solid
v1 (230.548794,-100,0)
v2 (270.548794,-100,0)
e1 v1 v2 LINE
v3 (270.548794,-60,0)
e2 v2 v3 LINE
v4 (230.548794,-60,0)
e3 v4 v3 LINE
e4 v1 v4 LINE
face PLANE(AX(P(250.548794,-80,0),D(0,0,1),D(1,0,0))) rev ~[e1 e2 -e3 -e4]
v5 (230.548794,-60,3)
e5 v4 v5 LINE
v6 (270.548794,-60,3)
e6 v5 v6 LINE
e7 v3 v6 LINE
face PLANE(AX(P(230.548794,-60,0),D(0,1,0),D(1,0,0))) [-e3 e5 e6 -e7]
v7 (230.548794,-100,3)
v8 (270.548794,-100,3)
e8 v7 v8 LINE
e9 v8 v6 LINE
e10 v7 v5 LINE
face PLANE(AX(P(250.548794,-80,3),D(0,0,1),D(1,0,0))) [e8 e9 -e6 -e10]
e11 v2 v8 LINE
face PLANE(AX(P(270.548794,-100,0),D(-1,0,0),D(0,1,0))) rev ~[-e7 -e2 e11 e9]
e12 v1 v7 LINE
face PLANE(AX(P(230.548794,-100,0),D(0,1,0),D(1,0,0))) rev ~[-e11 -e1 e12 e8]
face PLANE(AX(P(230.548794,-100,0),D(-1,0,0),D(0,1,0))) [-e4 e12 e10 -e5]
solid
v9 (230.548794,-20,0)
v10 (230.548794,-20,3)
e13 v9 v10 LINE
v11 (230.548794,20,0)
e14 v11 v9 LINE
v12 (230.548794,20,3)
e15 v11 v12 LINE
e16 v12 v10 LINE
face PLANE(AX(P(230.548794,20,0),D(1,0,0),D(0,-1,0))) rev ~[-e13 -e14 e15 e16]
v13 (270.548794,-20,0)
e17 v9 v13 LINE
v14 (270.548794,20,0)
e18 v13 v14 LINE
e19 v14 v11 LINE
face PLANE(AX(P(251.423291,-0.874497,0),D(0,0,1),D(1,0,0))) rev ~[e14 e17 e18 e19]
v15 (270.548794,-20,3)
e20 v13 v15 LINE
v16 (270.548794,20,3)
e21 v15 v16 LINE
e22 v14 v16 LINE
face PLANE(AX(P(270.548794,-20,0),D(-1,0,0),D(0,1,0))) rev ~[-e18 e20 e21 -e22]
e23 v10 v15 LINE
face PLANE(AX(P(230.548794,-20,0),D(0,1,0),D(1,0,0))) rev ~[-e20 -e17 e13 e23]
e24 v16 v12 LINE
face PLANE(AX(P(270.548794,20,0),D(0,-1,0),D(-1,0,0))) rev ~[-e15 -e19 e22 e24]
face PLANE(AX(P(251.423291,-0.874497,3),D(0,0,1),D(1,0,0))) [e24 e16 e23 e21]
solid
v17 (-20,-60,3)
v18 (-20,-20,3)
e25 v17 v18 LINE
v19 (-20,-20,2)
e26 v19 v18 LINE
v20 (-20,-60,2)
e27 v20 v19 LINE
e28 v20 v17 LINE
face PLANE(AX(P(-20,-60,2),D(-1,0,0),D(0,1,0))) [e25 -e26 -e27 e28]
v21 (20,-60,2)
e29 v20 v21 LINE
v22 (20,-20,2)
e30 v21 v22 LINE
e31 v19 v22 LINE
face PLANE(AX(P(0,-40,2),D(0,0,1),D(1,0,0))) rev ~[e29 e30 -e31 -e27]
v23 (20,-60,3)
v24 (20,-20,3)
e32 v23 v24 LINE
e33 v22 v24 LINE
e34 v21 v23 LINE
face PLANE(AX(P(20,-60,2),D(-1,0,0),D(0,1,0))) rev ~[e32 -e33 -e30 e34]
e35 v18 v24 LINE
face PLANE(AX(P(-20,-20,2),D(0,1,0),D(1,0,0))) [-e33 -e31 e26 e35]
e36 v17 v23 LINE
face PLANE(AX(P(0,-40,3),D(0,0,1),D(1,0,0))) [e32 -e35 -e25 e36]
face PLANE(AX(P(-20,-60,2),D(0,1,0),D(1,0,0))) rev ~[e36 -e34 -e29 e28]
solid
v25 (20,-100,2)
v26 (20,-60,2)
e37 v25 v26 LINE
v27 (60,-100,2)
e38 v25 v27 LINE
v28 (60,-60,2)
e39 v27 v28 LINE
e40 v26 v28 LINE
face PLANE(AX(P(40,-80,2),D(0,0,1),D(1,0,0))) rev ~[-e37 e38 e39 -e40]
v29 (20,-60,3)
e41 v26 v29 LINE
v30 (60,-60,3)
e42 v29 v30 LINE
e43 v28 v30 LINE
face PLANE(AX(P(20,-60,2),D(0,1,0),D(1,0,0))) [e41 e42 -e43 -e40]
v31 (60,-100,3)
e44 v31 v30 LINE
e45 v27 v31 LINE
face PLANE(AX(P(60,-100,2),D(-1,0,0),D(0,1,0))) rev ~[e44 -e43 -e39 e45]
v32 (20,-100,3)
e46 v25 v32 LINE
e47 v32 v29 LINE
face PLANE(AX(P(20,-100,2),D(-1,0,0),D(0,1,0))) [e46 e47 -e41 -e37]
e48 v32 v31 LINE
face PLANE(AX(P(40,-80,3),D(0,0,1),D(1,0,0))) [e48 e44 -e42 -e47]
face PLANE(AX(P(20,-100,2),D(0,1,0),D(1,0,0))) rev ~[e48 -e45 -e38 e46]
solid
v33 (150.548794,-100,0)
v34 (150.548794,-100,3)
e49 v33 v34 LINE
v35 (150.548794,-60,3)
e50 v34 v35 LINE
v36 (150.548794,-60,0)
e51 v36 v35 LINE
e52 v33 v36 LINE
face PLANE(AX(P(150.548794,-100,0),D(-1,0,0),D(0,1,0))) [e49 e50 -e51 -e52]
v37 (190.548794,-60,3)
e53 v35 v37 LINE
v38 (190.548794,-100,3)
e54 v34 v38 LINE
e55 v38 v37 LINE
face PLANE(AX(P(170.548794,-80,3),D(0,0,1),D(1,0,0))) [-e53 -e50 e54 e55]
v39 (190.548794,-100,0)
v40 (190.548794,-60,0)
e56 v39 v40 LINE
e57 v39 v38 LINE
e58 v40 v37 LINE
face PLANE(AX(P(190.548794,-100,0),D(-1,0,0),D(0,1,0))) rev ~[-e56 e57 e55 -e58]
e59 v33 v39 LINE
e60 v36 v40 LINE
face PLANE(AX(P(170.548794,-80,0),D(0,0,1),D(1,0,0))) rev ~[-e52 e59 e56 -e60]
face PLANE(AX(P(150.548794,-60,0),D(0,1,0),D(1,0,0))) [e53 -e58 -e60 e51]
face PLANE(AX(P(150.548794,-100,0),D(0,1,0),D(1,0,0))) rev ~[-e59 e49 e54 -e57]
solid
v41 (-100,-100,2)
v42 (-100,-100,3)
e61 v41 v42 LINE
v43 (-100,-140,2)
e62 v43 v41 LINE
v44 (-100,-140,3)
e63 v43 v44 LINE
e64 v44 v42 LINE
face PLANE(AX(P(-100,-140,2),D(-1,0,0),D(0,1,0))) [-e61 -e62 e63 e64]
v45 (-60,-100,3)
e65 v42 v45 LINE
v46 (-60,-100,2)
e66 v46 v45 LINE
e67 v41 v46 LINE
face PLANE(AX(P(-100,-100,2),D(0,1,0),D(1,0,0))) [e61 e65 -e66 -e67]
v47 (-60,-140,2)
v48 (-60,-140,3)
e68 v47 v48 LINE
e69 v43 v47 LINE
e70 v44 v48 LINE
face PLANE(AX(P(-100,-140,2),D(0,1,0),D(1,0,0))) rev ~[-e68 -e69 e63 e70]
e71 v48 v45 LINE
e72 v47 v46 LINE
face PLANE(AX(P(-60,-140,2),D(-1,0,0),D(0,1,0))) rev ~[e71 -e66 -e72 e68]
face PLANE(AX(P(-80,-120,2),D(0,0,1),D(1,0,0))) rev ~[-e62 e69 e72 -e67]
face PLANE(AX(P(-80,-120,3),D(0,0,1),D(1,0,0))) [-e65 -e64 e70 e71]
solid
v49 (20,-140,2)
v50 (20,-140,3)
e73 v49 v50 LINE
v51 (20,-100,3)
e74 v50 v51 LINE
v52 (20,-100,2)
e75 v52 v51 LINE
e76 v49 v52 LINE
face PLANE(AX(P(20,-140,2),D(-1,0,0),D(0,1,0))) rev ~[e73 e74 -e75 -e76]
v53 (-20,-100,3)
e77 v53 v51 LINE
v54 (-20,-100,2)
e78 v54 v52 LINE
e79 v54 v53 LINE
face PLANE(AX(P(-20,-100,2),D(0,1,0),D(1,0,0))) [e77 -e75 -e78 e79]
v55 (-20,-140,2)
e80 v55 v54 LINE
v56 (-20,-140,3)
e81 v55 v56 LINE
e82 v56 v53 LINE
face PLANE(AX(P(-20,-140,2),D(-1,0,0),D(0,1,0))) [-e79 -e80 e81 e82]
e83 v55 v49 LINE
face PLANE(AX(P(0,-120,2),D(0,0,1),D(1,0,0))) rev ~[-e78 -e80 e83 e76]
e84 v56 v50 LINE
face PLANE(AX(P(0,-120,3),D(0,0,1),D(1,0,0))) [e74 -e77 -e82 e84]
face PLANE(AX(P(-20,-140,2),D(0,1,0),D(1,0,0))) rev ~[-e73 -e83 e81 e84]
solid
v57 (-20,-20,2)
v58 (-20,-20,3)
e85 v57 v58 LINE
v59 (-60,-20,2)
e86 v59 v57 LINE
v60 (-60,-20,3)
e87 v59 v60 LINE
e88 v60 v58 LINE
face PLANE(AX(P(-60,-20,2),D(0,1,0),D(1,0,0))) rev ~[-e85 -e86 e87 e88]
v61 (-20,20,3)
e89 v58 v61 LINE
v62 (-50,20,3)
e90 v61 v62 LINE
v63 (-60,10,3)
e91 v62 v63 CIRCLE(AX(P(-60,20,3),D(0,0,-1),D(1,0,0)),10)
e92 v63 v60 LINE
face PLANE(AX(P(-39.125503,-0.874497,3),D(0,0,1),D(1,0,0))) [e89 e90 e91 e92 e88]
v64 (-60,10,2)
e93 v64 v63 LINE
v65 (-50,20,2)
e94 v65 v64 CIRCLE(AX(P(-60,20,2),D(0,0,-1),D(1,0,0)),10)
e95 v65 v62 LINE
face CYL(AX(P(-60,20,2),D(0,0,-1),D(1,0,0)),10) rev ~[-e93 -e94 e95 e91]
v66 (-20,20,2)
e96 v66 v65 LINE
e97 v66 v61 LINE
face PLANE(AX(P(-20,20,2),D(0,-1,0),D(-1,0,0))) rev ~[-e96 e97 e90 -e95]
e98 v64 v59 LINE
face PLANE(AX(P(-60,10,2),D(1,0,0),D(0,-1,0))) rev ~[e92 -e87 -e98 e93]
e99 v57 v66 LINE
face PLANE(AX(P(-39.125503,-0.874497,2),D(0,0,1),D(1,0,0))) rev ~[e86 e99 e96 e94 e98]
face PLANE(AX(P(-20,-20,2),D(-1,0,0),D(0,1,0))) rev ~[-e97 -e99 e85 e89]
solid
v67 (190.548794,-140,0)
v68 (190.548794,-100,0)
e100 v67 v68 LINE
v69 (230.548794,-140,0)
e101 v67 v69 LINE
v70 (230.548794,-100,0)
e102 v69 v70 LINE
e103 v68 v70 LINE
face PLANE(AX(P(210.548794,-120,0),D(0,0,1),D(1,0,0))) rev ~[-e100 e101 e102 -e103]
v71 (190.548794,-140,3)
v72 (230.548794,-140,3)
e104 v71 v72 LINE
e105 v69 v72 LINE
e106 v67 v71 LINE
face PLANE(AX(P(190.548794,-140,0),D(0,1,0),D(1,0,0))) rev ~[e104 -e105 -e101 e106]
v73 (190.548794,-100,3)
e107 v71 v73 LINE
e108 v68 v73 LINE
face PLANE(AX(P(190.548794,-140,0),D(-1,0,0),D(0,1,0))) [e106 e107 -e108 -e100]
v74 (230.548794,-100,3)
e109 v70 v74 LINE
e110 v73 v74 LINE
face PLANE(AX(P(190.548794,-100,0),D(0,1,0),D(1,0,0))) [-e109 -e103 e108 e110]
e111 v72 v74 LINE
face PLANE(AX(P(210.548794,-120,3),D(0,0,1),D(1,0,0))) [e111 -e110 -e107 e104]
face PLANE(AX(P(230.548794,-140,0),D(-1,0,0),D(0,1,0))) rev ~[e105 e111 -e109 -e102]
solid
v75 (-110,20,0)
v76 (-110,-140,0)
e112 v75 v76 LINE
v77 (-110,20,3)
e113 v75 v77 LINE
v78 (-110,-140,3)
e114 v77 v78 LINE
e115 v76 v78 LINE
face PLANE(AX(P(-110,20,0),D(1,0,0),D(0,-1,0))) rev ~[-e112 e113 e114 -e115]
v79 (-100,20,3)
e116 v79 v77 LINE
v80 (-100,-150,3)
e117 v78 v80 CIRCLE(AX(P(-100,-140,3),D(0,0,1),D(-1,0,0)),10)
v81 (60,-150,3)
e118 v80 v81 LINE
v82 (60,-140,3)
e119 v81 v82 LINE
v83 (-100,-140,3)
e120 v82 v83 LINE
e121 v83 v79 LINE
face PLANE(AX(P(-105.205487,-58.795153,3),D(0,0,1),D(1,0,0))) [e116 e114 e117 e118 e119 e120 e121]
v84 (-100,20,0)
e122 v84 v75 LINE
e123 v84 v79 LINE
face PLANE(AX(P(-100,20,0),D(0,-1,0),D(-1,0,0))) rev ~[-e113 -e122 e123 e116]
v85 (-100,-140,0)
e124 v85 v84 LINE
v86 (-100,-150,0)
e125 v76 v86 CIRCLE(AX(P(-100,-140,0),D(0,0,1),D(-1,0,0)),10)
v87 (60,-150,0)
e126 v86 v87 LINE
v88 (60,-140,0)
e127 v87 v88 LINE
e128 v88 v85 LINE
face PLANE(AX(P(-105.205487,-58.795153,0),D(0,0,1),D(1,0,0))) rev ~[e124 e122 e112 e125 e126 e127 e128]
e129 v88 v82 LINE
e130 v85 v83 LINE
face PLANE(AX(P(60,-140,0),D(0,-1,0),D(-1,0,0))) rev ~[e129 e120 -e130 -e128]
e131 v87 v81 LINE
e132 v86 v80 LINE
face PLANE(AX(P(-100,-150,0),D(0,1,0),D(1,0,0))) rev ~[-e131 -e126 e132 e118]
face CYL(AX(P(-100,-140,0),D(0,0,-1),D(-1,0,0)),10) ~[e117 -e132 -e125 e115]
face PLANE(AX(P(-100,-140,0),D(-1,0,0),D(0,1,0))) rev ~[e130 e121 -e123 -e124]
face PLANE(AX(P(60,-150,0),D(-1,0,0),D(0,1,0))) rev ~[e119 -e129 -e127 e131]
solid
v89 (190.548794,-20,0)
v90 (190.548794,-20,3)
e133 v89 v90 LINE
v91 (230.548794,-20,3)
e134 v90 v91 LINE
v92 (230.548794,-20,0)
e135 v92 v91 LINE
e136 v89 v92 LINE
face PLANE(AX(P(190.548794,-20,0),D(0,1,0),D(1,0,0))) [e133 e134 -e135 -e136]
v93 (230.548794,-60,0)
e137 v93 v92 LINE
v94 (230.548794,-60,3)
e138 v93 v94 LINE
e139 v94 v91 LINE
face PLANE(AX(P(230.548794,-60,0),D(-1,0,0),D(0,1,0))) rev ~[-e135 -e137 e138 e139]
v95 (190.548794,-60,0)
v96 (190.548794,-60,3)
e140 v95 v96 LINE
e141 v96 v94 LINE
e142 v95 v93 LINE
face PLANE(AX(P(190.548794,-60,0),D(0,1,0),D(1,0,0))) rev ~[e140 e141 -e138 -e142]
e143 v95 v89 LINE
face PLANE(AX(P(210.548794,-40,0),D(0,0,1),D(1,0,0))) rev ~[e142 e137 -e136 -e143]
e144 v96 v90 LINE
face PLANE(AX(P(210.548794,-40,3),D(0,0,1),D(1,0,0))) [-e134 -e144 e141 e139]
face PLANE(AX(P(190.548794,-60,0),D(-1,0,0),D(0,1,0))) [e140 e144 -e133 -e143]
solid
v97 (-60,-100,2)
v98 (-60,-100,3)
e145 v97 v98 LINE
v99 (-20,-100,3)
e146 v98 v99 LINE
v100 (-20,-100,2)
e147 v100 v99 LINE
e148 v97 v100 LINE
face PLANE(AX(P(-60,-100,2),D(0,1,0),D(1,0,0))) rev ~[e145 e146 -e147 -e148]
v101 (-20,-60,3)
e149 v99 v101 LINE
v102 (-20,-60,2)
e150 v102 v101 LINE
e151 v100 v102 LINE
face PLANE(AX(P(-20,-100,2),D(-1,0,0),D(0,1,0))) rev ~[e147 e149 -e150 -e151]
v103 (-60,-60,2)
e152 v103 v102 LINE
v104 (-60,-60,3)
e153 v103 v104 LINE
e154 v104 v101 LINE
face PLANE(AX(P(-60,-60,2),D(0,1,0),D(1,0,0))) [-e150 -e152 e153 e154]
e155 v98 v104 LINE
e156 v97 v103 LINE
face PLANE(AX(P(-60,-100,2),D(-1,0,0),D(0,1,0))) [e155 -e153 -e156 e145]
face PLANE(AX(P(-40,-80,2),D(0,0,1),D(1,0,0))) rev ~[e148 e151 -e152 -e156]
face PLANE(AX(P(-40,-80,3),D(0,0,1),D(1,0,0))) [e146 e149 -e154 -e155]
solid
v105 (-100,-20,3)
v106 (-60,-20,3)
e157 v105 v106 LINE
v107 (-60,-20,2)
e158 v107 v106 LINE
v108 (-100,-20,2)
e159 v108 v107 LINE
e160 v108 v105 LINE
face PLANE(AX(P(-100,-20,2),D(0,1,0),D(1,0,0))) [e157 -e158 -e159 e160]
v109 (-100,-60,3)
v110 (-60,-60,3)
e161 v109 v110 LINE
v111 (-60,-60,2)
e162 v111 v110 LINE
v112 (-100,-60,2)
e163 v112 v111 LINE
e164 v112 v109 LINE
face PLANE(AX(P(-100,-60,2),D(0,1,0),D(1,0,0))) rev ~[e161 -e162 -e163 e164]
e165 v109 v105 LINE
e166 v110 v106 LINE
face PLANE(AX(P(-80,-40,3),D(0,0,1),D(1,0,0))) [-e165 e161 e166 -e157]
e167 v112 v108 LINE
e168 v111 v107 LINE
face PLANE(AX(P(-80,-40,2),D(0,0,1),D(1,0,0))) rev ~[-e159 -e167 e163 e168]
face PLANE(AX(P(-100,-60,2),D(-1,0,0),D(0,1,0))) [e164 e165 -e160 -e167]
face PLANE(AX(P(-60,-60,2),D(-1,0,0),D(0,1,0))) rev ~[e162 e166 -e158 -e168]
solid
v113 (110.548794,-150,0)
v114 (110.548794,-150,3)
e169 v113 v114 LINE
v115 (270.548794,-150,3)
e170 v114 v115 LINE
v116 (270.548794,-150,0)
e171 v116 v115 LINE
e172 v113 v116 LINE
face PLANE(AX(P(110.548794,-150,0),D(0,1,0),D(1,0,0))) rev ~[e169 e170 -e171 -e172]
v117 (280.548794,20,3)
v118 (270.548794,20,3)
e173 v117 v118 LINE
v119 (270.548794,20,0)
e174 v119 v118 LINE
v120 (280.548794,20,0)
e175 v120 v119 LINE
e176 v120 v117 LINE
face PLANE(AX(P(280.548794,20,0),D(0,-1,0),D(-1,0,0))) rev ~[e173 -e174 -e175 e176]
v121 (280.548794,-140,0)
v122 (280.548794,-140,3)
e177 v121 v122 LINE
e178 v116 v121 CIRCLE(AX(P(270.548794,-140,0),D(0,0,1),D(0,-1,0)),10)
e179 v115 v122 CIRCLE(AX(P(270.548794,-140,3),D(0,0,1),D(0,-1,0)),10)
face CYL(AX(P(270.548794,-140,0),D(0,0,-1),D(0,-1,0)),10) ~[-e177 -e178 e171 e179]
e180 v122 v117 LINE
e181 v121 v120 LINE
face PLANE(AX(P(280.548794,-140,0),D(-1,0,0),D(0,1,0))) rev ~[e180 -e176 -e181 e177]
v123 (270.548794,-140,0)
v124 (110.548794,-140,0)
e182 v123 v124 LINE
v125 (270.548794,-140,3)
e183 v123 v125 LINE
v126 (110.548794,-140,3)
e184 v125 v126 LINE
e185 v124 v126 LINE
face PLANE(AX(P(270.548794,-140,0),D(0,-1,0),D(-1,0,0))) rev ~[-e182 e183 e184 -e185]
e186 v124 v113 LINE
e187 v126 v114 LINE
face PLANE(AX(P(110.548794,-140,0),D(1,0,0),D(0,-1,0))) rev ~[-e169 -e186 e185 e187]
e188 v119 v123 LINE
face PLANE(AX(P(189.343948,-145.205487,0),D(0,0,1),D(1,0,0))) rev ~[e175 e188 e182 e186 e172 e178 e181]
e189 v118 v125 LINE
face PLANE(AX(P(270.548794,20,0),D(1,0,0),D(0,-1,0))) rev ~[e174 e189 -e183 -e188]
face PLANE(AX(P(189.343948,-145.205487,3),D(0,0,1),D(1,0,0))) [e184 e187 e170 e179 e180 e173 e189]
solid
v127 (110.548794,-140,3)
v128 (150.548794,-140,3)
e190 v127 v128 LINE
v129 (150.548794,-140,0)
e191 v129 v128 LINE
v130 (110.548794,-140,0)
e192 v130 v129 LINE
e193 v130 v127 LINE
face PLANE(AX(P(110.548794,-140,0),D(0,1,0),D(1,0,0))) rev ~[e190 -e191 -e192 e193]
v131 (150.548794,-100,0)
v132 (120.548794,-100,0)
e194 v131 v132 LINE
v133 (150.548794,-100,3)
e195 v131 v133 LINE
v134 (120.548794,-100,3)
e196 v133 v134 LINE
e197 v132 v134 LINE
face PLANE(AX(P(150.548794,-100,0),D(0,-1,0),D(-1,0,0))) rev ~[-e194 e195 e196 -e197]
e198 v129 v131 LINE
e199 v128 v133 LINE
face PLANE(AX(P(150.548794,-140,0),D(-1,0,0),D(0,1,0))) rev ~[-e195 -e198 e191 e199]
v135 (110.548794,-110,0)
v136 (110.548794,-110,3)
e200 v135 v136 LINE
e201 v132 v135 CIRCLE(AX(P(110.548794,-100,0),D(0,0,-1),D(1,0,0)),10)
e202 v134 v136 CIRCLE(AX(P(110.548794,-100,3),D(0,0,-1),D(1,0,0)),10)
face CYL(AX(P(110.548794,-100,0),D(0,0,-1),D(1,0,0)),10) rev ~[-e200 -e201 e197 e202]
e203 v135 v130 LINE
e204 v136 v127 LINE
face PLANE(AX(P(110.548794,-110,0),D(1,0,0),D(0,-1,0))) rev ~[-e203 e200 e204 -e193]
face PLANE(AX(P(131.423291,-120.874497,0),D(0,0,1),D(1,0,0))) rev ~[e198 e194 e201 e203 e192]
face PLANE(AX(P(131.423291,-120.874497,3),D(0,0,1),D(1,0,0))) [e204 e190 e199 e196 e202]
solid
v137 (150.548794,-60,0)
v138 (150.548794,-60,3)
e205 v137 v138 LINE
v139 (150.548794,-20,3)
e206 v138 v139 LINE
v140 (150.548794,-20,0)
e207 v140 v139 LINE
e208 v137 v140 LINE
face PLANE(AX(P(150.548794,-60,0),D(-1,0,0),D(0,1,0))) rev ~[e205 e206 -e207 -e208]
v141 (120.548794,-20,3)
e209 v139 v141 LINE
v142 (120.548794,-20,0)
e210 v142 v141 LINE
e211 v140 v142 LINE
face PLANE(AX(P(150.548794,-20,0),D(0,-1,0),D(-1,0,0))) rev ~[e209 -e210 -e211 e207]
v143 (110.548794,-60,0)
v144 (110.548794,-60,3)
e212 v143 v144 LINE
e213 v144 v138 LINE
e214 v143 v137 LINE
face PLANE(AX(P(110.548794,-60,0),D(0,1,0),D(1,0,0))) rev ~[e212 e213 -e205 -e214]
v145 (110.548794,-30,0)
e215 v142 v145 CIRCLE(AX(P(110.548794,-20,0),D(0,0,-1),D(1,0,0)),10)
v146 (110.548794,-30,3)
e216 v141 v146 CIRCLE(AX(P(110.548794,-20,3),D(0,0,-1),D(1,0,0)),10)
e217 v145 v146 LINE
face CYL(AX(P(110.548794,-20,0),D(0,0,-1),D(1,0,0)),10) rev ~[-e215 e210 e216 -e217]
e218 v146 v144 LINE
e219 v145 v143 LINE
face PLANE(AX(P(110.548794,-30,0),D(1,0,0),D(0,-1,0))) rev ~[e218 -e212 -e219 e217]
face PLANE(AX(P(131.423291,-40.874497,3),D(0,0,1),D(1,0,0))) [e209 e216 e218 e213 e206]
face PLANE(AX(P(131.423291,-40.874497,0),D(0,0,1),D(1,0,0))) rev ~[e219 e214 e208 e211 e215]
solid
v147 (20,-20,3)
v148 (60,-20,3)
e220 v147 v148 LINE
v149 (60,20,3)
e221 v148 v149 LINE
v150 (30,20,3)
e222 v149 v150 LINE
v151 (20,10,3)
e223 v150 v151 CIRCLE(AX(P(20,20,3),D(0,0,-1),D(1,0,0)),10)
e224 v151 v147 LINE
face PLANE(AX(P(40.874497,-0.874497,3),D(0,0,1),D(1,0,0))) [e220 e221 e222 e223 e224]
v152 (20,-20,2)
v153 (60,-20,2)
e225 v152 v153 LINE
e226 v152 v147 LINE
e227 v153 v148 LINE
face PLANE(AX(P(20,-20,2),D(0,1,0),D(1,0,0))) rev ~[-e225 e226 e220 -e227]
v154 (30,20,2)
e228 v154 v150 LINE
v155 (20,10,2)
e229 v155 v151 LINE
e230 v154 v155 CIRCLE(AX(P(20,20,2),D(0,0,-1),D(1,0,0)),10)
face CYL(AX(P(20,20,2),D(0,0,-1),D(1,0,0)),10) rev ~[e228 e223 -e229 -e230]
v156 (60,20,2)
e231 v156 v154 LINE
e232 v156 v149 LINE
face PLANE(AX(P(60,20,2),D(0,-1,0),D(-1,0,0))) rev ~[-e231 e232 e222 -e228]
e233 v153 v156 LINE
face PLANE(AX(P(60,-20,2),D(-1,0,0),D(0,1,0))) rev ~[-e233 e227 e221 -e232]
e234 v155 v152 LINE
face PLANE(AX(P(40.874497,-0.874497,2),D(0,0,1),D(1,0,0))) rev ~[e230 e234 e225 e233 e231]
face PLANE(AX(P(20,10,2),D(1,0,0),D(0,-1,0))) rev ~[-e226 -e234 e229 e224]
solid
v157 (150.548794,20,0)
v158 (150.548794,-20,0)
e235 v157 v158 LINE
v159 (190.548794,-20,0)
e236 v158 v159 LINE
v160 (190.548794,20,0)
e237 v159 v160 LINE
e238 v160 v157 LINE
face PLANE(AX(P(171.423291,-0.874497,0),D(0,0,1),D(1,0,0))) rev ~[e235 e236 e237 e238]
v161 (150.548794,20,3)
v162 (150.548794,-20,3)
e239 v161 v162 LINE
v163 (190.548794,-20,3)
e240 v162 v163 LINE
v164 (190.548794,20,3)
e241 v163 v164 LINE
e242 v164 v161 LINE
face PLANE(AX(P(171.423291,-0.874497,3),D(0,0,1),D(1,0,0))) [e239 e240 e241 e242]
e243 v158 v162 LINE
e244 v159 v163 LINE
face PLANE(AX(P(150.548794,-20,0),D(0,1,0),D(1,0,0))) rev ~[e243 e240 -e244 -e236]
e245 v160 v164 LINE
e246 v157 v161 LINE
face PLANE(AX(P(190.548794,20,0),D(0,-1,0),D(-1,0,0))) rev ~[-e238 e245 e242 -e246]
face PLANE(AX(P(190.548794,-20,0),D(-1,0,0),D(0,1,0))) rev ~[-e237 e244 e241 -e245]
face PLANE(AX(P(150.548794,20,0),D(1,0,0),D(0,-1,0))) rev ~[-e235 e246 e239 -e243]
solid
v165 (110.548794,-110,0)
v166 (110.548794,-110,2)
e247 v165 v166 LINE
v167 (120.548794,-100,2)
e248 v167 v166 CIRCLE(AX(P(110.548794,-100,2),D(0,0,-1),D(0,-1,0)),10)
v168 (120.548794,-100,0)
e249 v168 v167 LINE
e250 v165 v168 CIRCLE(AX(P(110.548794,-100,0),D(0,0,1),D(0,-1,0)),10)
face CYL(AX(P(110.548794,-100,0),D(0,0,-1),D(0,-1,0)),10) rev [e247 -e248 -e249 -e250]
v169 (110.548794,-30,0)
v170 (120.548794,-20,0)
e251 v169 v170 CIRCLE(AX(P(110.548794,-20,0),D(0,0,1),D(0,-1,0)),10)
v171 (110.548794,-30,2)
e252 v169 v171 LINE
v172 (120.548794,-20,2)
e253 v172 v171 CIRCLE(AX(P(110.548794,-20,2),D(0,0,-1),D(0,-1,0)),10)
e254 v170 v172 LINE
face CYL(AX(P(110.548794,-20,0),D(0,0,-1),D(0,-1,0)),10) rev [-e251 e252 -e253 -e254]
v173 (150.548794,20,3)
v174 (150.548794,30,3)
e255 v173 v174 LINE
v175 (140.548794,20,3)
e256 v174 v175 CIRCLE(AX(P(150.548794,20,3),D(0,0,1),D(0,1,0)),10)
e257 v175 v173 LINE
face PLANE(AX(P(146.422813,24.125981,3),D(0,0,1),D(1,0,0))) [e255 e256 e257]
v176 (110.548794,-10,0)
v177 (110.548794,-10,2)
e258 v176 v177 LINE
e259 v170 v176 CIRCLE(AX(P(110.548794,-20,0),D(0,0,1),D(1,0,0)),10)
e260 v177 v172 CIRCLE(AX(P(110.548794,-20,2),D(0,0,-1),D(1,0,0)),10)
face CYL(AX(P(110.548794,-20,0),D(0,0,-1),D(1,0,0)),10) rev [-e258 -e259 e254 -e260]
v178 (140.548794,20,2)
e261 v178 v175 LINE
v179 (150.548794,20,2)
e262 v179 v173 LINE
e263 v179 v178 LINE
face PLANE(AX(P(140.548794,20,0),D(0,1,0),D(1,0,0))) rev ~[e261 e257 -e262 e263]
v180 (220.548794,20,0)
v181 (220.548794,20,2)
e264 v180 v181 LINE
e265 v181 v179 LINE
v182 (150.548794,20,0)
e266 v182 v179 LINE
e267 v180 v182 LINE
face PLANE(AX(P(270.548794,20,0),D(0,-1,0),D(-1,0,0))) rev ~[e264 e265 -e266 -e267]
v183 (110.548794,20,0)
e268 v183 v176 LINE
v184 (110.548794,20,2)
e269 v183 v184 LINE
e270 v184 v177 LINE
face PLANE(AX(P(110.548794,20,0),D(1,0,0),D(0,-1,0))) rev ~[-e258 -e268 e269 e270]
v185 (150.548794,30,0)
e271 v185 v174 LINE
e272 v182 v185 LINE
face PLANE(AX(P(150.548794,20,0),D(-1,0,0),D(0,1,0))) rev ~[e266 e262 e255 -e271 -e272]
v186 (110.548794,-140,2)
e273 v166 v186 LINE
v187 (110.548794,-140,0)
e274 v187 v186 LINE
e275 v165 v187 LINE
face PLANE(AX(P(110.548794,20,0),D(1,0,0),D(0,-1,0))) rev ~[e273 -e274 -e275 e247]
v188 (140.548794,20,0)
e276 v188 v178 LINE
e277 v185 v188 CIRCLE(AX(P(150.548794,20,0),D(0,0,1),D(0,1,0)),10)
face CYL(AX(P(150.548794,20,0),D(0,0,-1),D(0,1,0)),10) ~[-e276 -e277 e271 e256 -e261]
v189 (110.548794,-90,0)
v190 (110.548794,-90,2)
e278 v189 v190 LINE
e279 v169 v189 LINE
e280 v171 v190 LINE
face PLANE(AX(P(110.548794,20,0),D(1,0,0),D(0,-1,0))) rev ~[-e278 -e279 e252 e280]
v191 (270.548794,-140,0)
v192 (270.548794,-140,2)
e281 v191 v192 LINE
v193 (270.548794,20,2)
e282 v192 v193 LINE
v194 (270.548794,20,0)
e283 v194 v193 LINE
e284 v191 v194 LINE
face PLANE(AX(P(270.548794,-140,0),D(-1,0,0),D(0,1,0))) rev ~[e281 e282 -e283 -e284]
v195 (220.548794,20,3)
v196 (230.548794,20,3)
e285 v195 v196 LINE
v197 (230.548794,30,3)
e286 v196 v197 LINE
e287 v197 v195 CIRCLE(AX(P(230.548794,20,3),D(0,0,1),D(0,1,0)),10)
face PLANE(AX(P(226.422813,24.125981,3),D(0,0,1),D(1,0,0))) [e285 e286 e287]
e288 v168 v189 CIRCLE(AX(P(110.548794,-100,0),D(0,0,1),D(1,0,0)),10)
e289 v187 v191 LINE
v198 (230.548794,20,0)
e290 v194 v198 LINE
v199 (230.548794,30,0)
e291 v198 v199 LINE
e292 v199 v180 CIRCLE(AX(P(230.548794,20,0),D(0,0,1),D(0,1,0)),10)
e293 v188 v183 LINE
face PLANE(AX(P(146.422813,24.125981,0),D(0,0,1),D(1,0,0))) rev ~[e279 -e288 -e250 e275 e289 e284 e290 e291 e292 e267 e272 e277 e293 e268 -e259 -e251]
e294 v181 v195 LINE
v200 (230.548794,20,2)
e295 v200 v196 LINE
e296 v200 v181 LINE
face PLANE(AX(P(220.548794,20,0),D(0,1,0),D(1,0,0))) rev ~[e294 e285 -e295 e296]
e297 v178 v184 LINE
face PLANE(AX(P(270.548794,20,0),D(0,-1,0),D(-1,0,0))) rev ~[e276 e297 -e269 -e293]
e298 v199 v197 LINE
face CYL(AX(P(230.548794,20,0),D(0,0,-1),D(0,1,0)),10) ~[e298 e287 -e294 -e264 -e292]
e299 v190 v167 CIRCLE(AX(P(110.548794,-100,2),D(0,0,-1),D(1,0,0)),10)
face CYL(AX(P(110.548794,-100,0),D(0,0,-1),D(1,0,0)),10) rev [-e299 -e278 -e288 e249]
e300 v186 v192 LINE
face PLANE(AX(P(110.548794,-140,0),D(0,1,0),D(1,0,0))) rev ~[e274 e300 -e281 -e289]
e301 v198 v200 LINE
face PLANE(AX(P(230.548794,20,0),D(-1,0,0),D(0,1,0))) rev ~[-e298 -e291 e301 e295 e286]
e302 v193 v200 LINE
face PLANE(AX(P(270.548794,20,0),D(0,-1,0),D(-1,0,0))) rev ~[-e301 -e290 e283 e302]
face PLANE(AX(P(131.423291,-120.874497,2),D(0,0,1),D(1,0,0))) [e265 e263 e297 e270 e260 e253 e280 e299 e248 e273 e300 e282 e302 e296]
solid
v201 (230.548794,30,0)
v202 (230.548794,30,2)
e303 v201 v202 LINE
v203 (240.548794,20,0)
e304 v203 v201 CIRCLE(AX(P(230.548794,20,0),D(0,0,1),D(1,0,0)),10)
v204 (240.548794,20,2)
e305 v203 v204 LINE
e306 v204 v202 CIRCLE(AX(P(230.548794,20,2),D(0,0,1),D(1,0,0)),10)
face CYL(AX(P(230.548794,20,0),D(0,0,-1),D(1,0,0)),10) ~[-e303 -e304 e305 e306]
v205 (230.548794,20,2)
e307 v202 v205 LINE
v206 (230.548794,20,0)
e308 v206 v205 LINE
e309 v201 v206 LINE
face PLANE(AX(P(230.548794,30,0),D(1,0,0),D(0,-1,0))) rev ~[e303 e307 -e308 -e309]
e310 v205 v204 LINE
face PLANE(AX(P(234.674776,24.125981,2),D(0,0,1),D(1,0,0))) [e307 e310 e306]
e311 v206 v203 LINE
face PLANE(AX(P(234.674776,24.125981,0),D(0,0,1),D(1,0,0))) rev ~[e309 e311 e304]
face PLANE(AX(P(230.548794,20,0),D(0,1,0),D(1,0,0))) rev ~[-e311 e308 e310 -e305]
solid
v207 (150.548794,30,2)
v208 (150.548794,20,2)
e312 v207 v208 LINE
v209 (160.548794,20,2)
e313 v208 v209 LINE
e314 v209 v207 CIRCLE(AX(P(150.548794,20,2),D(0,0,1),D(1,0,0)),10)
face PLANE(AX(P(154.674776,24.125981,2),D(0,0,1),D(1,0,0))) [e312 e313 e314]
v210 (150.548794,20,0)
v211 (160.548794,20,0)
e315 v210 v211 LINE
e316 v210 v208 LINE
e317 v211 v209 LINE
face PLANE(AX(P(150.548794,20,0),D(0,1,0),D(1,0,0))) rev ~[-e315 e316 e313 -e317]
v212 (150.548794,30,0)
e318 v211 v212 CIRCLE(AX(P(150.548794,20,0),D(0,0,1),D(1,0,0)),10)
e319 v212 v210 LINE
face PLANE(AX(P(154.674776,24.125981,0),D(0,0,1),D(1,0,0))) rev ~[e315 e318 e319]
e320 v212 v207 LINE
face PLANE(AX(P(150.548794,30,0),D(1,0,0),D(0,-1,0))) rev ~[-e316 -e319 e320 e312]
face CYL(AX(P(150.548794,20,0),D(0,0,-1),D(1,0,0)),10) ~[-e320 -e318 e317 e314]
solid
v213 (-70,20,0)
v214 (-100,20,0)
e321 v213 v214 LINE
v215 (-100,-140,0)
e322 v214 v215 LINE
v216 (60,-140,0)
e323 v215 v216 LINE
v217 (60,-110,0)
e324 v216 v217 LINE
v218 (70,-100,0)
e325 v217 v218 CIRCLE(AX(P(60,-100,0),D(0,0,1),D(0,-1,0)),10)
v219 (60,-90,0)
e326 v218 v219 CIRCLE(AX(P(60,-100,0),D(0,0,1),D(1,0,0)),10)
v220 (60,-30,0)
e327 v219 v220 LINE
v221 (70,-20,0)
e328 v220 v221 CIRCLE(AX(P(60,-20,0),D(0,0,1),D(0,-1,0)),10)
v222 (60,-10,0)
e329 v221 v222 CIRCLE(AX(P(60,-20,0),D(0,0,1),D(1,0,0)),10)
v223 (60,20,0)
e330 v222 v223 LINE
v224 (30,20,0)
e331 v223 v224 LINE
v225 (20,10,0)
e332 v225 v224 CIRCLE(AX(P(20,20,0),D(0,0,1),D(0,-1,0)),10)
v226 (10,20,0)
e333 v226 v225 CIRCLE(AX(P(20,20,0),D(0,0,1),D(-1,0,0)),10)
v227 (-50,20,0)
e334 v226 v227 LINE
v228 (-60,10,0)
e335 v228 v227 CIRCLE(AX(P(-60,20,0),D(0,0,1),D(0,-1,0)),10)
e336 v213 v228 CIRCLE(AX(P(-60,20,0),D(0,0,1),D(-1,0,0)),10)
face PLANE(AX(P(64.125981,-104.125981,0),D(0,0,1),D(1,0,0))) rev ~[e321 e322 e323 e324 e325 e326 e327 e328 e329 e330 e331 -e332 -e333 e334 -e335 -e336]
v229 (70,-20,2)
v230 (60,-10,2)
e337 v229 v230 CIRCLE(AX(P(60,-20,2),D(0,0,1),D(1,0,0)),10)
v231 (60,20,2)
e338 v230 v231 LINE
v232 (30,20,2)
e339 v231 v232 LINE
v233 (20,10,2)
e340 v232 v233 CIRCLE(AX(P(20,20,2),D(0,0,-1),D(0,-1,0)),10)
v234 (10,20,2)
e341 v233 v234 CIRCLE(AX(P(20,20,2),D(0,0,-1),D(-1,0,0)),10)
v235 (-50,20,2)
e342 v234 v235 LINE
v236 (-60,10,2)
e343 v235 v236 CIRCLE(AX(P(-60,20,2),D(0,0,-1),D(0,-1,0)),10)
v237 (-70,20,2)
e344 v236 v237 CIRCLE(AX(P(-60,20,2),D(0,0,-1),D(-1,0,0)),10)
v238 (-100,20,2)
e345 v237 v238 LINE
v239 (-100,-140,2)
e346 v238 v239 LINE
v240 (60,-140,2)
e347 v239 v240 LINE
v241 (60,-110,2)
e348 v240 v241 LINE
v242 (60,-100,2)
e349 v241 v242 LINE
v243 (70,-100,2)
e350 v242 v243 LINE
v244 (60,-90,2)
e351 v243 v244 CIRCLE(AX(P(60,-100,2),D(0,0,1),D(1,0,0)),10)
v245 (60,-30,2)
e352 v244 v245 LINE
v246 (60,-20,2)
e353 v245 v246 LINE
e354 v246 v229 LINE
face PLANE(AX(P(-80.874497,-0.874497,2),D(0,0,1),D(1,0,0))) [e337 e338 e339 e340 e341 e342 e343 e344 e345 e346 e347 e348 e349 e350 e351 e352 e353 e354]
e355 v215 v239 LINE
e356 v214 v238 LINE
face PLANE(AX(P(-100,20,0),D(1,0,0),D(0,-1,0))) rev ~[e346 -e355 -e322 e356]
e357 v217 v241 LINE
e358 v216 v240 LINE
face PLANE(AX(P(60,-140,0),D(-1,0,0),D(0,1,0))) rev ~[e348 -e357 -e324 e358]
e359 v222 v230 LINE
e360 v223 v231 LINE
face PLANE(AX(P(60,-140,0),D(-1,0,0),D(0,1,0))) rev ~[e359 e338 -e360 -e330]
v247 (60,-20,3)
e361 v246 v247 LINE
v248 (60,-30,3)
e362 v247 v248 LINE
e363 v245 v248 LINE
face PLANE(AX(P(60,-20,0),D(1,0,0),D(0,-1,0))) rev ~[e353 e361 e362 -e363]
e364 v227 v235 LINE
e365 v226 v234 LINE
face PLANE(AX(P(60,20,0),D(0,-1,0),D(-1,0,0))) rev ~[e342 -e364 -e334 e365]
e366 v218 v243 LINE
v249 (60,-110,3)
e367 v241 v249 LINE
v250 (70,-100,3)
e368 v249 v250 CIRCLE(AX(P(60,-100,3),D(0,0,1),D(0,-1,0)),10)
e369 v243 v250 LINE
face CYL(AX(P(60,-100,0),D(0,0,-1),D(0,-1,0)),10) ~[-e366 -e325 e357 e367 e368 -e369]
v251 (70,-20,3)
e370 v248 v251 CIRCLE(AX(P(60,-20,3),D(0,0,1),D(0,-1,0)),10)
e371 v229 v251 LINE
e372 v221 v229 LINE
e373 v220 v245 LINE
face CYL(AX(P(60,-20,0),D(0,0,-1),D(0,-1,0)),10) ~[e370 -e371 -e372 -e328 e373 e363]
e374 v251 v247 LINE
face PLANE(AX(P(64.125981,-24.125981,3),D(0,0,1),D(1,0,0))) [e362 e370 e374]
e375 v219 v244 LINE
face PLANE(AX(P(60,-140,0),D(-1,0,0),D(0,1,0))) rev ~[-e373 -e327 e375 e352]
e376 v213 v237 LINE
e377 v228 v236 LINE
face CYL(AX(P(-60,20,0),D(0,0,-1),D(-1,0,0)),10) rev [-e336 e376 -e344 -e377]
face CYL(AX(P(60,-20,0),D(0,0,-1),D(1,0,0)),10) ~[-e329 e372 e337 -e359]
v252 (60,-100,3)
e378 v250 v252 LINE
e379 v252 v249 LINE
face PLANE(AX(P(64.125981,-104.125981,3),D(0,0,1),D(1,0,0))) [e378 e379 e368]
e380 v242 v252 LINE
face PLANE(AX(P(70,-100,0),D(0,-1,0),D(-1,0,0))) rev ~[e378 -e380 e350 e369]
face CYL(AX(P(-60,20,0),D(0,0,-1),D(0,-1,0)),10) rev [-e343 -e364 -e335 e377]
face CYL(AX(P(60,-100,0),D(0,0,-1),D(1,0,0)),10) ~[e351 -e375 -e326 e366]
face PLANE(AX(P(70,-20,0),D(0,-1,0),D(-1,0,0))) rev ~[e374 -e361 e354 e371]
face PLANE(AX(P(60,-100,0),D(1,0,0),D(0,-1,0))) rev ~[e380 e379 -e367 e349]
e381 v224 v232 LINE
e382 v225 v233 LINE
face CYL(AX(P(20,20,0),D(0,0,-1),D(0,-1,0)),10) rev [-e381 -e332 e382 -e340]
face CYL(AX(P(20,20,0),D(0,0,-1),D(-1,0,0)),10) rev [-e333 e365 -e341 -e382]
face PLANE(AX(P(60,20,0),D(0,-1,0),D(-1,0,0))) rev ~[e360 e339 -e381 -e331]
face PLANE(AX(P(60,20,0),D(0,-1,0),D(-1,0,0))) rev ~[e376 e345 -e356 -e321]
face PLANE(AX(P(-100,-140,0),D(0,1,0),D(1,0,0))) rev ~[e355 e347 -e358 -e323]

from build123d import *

# Parameters (mm, degrees)
F0_W      = 40
F0_H      = 40
F1_DEPTH  = 2
F3_DEPTH  = 2
F4_DEPTH  = 5
F2_W      = 40
F2_H      = 40
F5_DEPTH  = 1
F6_DEPTH  = 2
F7_DEPTH  = 3
F8_DEPTH  = 4
F9_DEPTH  = 3
F10_DEPTH = 3
F11_DEPTH = 3
F12_DEPTH = 2


with BuildPart() as f1:
    # F0 (on Top) → F1 (new body)
    with BuildSketch(Plane.XY):
        with BuildLine():
            Line((-100, -20), (-60, -20))
            Line((-60, -20), (-60, 10))
            ThreePointArc((-60, 10), (-67.0710678119, 12.9289321881), (-70, 20))
            Line((-70, 20), (-100, 20))
            Line((-100, 20), (-100, -20))
        make_face()
        with BuildLine():
            ThreePointArc((-70, 20), (-67.0710678119, 12.9289321881), (-60, 10))
            Line((-60, 10), (-60, 20))
            Line((-60, 20), (-70, 20))
        make_face()
        with BuildLine():
            ThreePointArc((-60, 10), (-52.9289321881, 12.9289321881), (-50, 20))
            Line((-50, 20), (-60, 20))
            Line((-60, 20), (-60, 10))
        make_face()
        with BuildLine():
            Line((-60, -20), (-20, -20))
            Line((-20, -20), (-20, 20))
            Line((-20, 20), (-50, 20))
            ThreePointArc((-50, 20), (-52.9289321881, 12.9289321881), (-60, 10))
            Line((-60, 10), (-60, -20))
        make_face()
        with BuildLine():
            Line((-20, -20), (20, -20))
            Line((20, -20), (20, 10))
            ThreePointArc((20, 10), (12.9289321881, 12.9289321881), (10, 20))
            Line((10, 20), (-20, 20))
            Line((-20, 20), (-20, -20))
        make_face()
        with BuildLine():
            ThreePointArc((10, 20), (12.9289321881, 12.9289321881), (20, 10))
            Line((20, 10), (20, 20))
            Line((20, 20), (10, 20))
        make_face()
        with BuildLine():
            Line((20, 20), (20, 10))
            ThreePointArc((20, 10), (27.0710678119, 12.9289321881), (30, 20))
            Line((30, 20), (20, 20))
        make_face()
        with BuildLine():
            Line((20, 10), (20, -20))
            Line((20, -20), (50, -20))
            ThreePointArc((50, -20), (52.9289321881, -12.9289321881), (60, -10))
            Line((60, -10), (60, 20))
            Line((60, 20), (30, 20))
            ThreePointArc((30, 20), (27.0710678119, 12.9289321881), (20, 10))
        make_face()
        with BuildLine():
            ThreePointArc((60, -10), (52.9289321881, -12.9289321881), (50, -20))
            Line((50, -20), (60, -20))
            Line((60, -20), (60, -10))
        make_face()
        with BuildLine():
            Line((60, -20), (50, -20))
            ThreePointArc((50, -20), (52.9289321881, -27.0710678119), (60, -30))
            Line((60, -30), (60, -20))
        make_face()
        with BuildLine():
            Line((50, -20), (20, -20))
            Line((20, -20), (20, -60))
            Line((20, -60), (60, -60))
            Line((60, -60), (60, -30))
            ThreePointArc((60, -30), (52.9289321881, -27.0710678119), (50, -20))
        make_face()
        with Locations((0, -40)):
            Rectangle(F0_W, F0_H)
        with Locations((-40, -40)):
            Rectangle(F0_W, F0_H)
        with Locations((-80, -40)):
            Rectangle(F0_W, F0_H)
        with Locations((-80, -80)):
            Rectangle(F0_W, F0_H)
        with BuildLine():
            Line((-60, -140), (-60, -100))
            Line((-60, -100), (-100, -100))
            Line((-100, -100), (-100, -130))
            ThreePointArc((-100, -130), (-92.9289321881, -132.9289321881), (-90, -140))
            Line((-90, -140), (-60, -140))
        make_face()
        with Locations((-40, -120)):
            Rectangle(F0_W, F0_H)
        with Locations((-40, -80)):
            Rectangle(F0_W, F0_H)
        with Locations((0, -80)):
            Rectangle(F0_W, F0_H)
        with Locations((0, -120)):
            Rectangle(F0_W, F0_H)
        with BuildLine():
            Line((50, -100), (20, -100))
            Line((20, -100), (20, -140))
            Line((20, -140), (60, -140))
            Line((60, -140), (60, -110))
            ThreePointArc((60, -110), (52.9289321881, -107.0710678119), (50, -100))
        make_face()
        with BuildLine():
            Line((60, -60), (20, -60))
            Line((20, -60), (20, -100))
            Line((20, -100), (50, -100))
            ThreePointArc((50, -100), (52.9289321881, -92.9289321881), (60, -90))
            Line((60, -90), (60, -60))
        make_face()
        with BuildLine():
            Line((60, -100), (60, -90))
            ThreePointArc((60, -90), (52.9289321881, -92.9289321881), (50, -100))
            Line((50, -100), (60, -100))
        make_face()
        with BuildLine():
            Line((60, -100), (50, -100))
            ThreePointArc((50, -100), (52.9289321881, -107.0710678119), (60, -110))
            Line((60, -110), (60, -100))
        make_face()
        with BuildLine():
            ThreePointArc((-90, -140), (-92.9289321881, -132.9289321881), (-100, -130))
            Line((-100, -130), (-100, -140))
            Line((-100, -140), (-90, -140))
        make_face()
    extrude(amount=F1_DEPTH)

    # F0 (on Top) → F3 (join)
    with BuildSketch(Plane.XY):
        with BuildLine():
            ThreePointArc((70, -100), (67.0710678119, -92.9289321881), (60, -90))
            Line((60, -90), (60, -100))
            Line((60, -100), (70, -100))
        make_face()
        with BuildLine():
            Line((60, -10), (60, -20))
            Line((60, -20), (70, -20))
            ThreePointArc((70, -20), (67.0710678119, -12.9289321881), (60, -10))
        make_face()
    extrude(amount=F3_DEPTH)

    # F0 (on Top) → F4 (cut)
    with BuildSketch(Plane.XY):
        with BuildLine():
            ThreePointArc((-70, 20), (-67.0710678119, 12.9289321881), (-60, 10))
            Line((-60, 10), (-60, 20))
            Line((-60, 20), (-70, 20))
        make_face()
        with BuildLine():
            ThreePointArc((-60, 10), (-52.9289321881, 12.9289321881), (-50, 20))
            Line((-50, 20), (-60, 20))
            Line((-60, 20), (-60, 10))
        make_face()
        with BuildLine():
            ThreePointArc((10, 20), (12.9289321881, 12.9289321881), (20, 10))
            Line((20, 10), (20, 20))
            Line((20, 20), (10, 20))
        make_face()
        with BuildLine():
            Line((20, 20), (20, 10))
            ThreePointArc((20, 10), (27.0710678119, 12.9289321881), (30, 20))
            Line((30, 20), (20, 20))
        make_face()
    extrude(amount=F4_DEPTH, mode=Mode.SUBTRACT)

    # F0 (on Top) → F10 (join)
    with BuildSketch(Plane.XY):
        with BuildLine():
            Line((70, -100), (60, -100))
            Line((60, -100), (60, -110))
            ThreePointArc((60, -110), (67.0710678119, -107.0710678119), (70, -100))
        make_face()
        with BuildLine():
            Line((70, -20), (60, -20))
            Line((60, -20), (60, -30))
            ThreePointArc((60, -30), (67.0710678119, -27.0710678119), (70, -20))
        make_face()
    extrude(amount=F10_DEPTH)


with BuildPart() as f5:
    # F2 (on face) → F5 (new body)
    with BuildSketch(Plane.XY.offset(2)):
        with Locations((-80, -120)):
            Rectangle(F2_W, F2_H)
    extrude(amount=F5_DEPTH)


with BuildPart() as f5b:
    # F2 (on face) → F5, piece 2 (new body)
    with BuildSketch(Plane.XY.offset(2)):
        with Locations((0, -120)):
            Rectangle(F2_W, F2_H)
    extrude(amount=F5_DEPTH)


with BuildPart() as f5c:
    # F2 (on face) → F5, piece 3 (new body)
    with BuildSketch(Plane.XY.offset(2)):
        with Locations((-40, -80)):
            Rectangle(F2_W, F2_H)
    extrude(amount=F5_DEPTH)


with BuildPart() as f5d:
    # F2 (on face) → F5, piece 4 (new body)
    with BuildSketch(Plane.XY.offset(2)):
        with Locations((40, -80)):
            Rectangle(F2_W, F2_H)
    extrude(amount=F5_DEPTH)


with BuildPart() as f5e:
    # F2 (on face) → F5, piece 5 (new body)
    with BuildSketch(Plane.XY.offset(2)):
        with Locations((-80, -40)):
            Rectangle(F2_W, F2_H)
    extrude(amount=F5_DEPTH)


with BuildPart() as f5f:
    # F2 (on face) → F5, piece 6 (new body)
    with BuildSketch(Plane.XY.offset(2)):
        with Locations((0, -40)):
            Rectangle(F2_W, F2_H)
    extrude(amount=F5_DEPTH)


with BuildPart() as f5g:
    # F2 (on face) → F5, piece 7 (new body)
    with BuildSketch(Plane.XY.offset(2)):
        with BuildLine():
            Line((60, -20), (60, 20))
            Line((60, 20), (30, 20))
            ThreePointArc((30, 20), (27.0710678119, 12.9289321881), (20, 10))
            Line((20, 10), (20, -20))
            Line((20, -20), (60, -20))
        make_face()
    extrude(amount=F5_DEPTH)


with BuildPart() as f5h:
    # F2 (on face) → F5, piece 8 (new body)
    with BuildSketch(Plane.XY.offset(2)):
        with BuildLine():
            Line((-60, -20), (-20, -20))
            Line((-20, -20), (-20, 20))
            Line((-20, 20), (-50, 20))
            ThreePointArc((-50, 20), (-52.9289321881, 12.9289321881), (-60, 10))
            Line((-60, 10), (-60, -20))
        make_face()
    extrude(amount=F5_DEPTH)


with BuildPart() as f6:
    # F0 (on Top) → F6 (new body)
    with BuildSketch(Plane.XY):
        with BuildLine():
            Line((150.5487942696, -140), (150.5487942696, -100))
            Line((150.5487942696, -100), (120.5487942696, -100))
            ThreePointArc((120.5487942696, -100), (117.6198620814, -107.0710678119), (110.5487942696, -110))
            Line((110.5487942696, -110), (110.5487942696, -140))
            Line((110.5487942696, -140), (150.5487942696, -140))
        make_face()
        with BuildLine():
            ThreePointArc((110.5487942696, -110), (117.6198620814, -107.0710678119), (120.5487942696, -100))
            Line((120.5487942696, -100), (110.5487942696, -100))
            Line((110.5487942696, -100), (110.5487942696, -110))
        make_face()
        with BuildLine():
            ThreePointArc((120.5487942696, -100), (117.6198620814, -92.9289321881), (110.5487942696, -90))
            Line((110.5487942696, -90), (110.5487942696, -100))
            Line((110.5487942696, -100), (120.5487942696, -100))
        make_face()
        with BuildLine():
            Line((150.5487942696, -100), (150.5487942696, -60))
            Line((150.5487942696, -60), (110.5487942696, -60))
            Line((110.5487942696, -60), (110.5487942696, -90))
            ThreePointArc((110.5487942696, -90), (117.6198620814, -92.9289321881), (120.5487942696, -100))
            Line((120.5487942696, -100), (150.5487942696, -100))
        make_face()
        with BuildLine():
            Line((150.5487942696, -20), (120.5487942696, -20))
            ThreePointArc((120.5487942696, -20), (117.6198620814, -27.0710678119), (110.5487942696, -30))
            Line((110.5487942696, -30), (110.5487942696, -60))
            Line((110.5487942696, -60), (150.5487942696, -60))
            Line((150.5487942696, -60), (150.5487942696, -20))
        make_face()
        with BuildLine():
            Line((120.5487942696, -20), (110.5487942696, -20))
            Line((110.5487942696, -20), (110.5487942696, -30))
            ThreePointArc((110.5487942696, -30), (117.6198620814, -27.0710678119), (120.5487942696, -20))
        make_face()
        with BuildLine():
            ThreePointArc((120.5487942696, -20), (117.6198620814, -12.9289321881), (110.5487942696, -10))
            Line((110.5487942696, -10), (110.5487942696, -20))
            Line((110.5487942696, -20), (120.5487942696, -20))
        make_face()
        with BuildLine():
            Line((140.5487942696, 20), (110.5487942696, 20))
            Line((110.5487942696, 20), (110.5487942696, -10))
            ThreePointArc((110.5487942696, -10), (117.6198620814, -12.9289321881), (120.5487942696, -20))
            Line((120.5487942696, -20), (150.5487942696, -20))
            Line((150.5487942696, -20), (150.5487942696, 10))
            ThreePointArc((150.5487942696, 10), (143.4777264577, 12.9289321881), (140.5487942696, 20))
        make_face()
        with BuildLine():
            Line((150.5487942696, 20), (140.5487942696, 20))
            ThreePointArc((140.5487942696, 20), (143.4777264577, 12.9289321881), (150.5487942696, 10))
            Line((150.5487942696, 10), (150.5487942696, 20))
        make_face()
        with BuildLine():
            Line((160.5487942696, 20), (150.5487942696, 20))
            Line((150.5487942696, 20), (150.5487942696, 10))
            ThreePointArc((150.5487942696, 10), (157.6198620814, 12.9289321881), (160.5487942696, 20))
        make_face()
        with BuildLine():
            ThreePointArc((160.5487942696, 20), (157.6198620814, 12.9289321881), (150.5487942696, 10))
            Line((150.5487942696, 10), (150.5487942696, -20))
            Line((150.5487942696, -20), (190.5487942696, -20))
            Line((190.5487942696, -20), (190.5487942696, 20))
            Line((190.5487942696, 20), (160.5487942696, 20))
        make_face()
        with BuildLine():
            Line((220.5487942696, 20), (190.5487942696, 20))
            Line((190.5487942696, 20), (190.5487942696, -20))
            Line((190.5487942696, -20), (230.5487942696, -20))
            Line((230.5487942696, -20), (230.5487942696, 10))
            ThreePointArc((230.5487942696, 10), (223.4777264577, 12.9289321881), (220.5487942696, 20))
        make_face()
        with BuildLine():
            Line((230.5487942696, 20), (220.5487942696, 20))
            ThreePointArc((220.5487942696, 20), (223.4777264577, 12.9289321881), (230.5487942696, 10))
            Line((230.5487942696, 10), (230.5487942696, 20))
        make_face()
        with BuildLine():
            Line((240.5487942696, 20), (230.5487942696, 20))
            Line((230.5487942696, 20), (230.5487942696, 10))
            ThreePointArc((230.5487942696, 10), (237.6198620814, 12.9289321881), (240.5487942696, 20))
        make_face()
        with BuildLine():
            Line((230.5487942696, 10), (230.5487942696, -20))
            Line((230.5487942696, -20), (270.5487942696, -20))
            Line((270.5487942696, -20), (270.5487942696, 20))
            Line((270.5487942696, 20), (240.5487942696, 20))
            ThreePointArc((240.5487942696, 20), (237.6198620814, 12.9289321881), (230.5487942696, 10))
        make_face()
        with Locations((250.5487942696, -40)):
            Rectangle(F0_W, F0_H)
        with Locations((210.5487942696, -40)):
            Rectangle(F0_W, F0_H)
        with Locations((170.5487942696, -40)):
            Rectangle(F0_W, F0_H)
        with Locations((170.5487942696, -80)):
            Rectangle(F0_W, F0_H)
        with Locations((210.5487942696, -80)):
            Rectangle(F0_W, F0_H)
        with Locations((250.5487942696, -80)):
            Rectangle(F0_W, F0_H)
        with BuildLine():
            Line((270.5487942696, -100), (230.5487942696, -100))
            Line((230.5487942696, -100), (230.5487942696, -140))
            Line((230.5487942696, -140), (260.5487942696, -140))
            ThreePointArc((260.5487942696, -140), (263.4777264577, -132.9289321881), (270.5487942696, -130))
            Line((270.5487942696, -130), (270.5487942696, -100))
        make_face()
        with Locations((210.5487942696, -120)):
            Rectangle(F0_W, F0_H)
        with Locations((170.5487942696, -120)):
            Rectangle(F0_W, F0_H)
        with BuildLine():
            ThreePointArc((270.5487942696, -130), (263.4777264577, -132.9289321881), (260.5487942696, -140))
            Line((260.5487942696, -140), (270.5487942696, -140))
            Line((270.5487942696, -140), (270.5487942696, -130))
        make_face()
    extrude(amount=F6_DEPTH)

    # F0 (on Top) → F7 (join)
    with BuildSketch(Plane.XY):
        with BuildLine():
            ThreePointArc((150.5487942696, 30), (143.4777264577, 27.0710678119), (140.5487942696, 20))
            Line((140.5487942696, 20), (150.5487942696, 20))
            Line((150.5487942696, 20), (150.5487942696, 30))
        make_face()
        with BuildLine():
            ThreePointArc((230.5487942696, 30), (223.4777264577, 27.0710678119), (220.5487942696, 20))
            Line((220.5487942696, 20), (230.5487942696, 20))
            Line((230.5487942696, 20), (230.5487942696, 30))
        make_face()
    extrude(amount=F7_DEPTH)

    # F0 (on Top) → F8 (cut)
    with BuildSketch(Plane.XY):
        with BuildLine():
            ThreePointArc((120.5487942696, -100), (117.6198620814, -92.9289321881), (110.5487942696, -90))
            Line((110.5487942696, -90), (110.5487942696, -100))
            Line((110.5487942696, -100), (120.5487942696, -100))
        make_face()
        with BuildLine():
            ThreePointArc((110.5487942696, -110), (117.6198620814, -107.0710678119), (120.5487942696, -100))
            Line((120.5487942696, -100), (110.5487942696, -100))
            Line((110.5487942696, -100), (110.5487942696, -110))
        make_face()
        with BuildLine():
            ThreePointArc((120.5487942696, -20), (117.6198620814, -12.9289321881), (110.5487942696, -10))
            Line((110.5487942696, -10), (110.5487942696, -20))
            Line((110.5487942696, -20), (120.5487942696, -20))
        make_face()
        with BuildLine():
            Line((120.5487942696, -20), (110.5487942696, -20))
            Line((110.5487942696, -20), (110.5487942696, -30))
            ThreePointArc((110.5487942696, -30), (117.6198620814, -27.0710678119), (120.5487942696, -20))
        make_face()
    extrude(amount=F8_DEPTH, mode=Mode.SUBTRACT)


with BuildPart() as f9:
    # F0 (on Top) → F9 (new body)
    with BuildSketch(Plane.XY):
        with BuildLine():
            Line((-100, -60), (-100, -20))
            Line((-100, -20), (-100, 20))
            Line((-100, 20), (-110, 20))
            Line((-110, 20), (-110, -140))
            ThreePointArc((-110, -140), (-107.0710678119, -132.9289321881), (-100, -130))
            Line((-100, -130), (-100, -100))
            Line((-100, -100), (-100, -60))
        make_face()
        Polygon((-100, -140), (-110, -140), (-100, -150), align=None)
        with BuildLine():
            ThreePointArc((-100, -150), (-92.9289321881, -147.0710678119), (-90, -140))
            Line((-90, -140), (-100, -140))
            Line((-100, -140), (-100, -150))
        make_face()
        with BuildLine():
            Line((60, -140), (20, -140))
            Line((20, -140), (-20, -140))
            Line((-20, -140), (-60, -140))
            Line((-60, -140), (-90, -140))
            ThreePointArc((-90, -140), (-92.9289321881, -147.0710678119), (-100, -150))
            Line((-100, -150), (60, -150))
            Line((60, -150), (60, -140))
        make_face()
        with BuildLine():
            ThreePointArc((-100, -130), (-107.0710678119, -132.9289321881), (-110, -140))
            Line((-110, -140), (-100, -140))
            Line((-100, -140), (-100, -130))
        make_face()
        with BuildLine():
            Line((-100, -150), (-110, -140))
            ThreePointArc((-110, -140), (-107.0710678119, -147.0710678119), (-100, -150))
        make_face()
    extrude(amount=F9_DEPTH)


with BuildPart() as f9b:
    # F0 (on Top) → F9, piece 2 (new body)
    with BuildSketch(Plane.XY):
        with BuildLine():
            Line((190.5487942696, -140), (150.5487942696, -140))
            Line((150.5487942696, -140), (110.5487942696, -140))
            Line((110.5487942696, -140), (110.5487942696, -150))
            Line((110.5487942696, -150), (270.5487942696, -150))
            ThreePointArc((270.5487942696, -150), (263.4777264577, -147.0710678119), (260.5487942696, -140))
            Line((260.5487942696, -140), (230.5487942696, -140))
            Line((230.5487942696, -140), (190.5487942696, -140))
        make_face()
        Polygon((270.5487942696, -140), (270.5487942696, -150), (280.5487942696, -140), align=None)
        with BuildLine():
            Line((270.5487942696, 20), (270.5487942696, -20))
            Line((270.5487942696, -20), (270.5487942696, -60))
            Line((270.5487942696, -60), (270.5487942696, -100))
            Line((270.5487942696, -100), (270.5487942696, -130))
            ThreePointArc((270.5487942696, -130), (277.6198620814, -132.9289321881), (280.5487942696, -140))
            Line((280.5487942696, -140), (280.5487942696, 20))
            Line((280.5487942696, 20), (270.5487942696, 20))
        make_face()
        with BuildLine():
            ThreePointArc((260.5487942696, -140), (263.4777264577, -147.0710678119), (270.5487942696, -150))
            Line((270.5487942696, -150), (270.5487942696, -140))
            Line((270.5487942696, -140), (260.5487942696, -140))
        make_face()
        with BuildLine():
            ThreePointArc((280.5487942696, -140), (277.6198620814, -132.9289321881), (270.5487942696, -130))
            Line((270.5487942696, -130), (270.5487942696, -140))
            Line((270.5487942696, -140), (280.5487942696, -140))
        make_face()
        with BuildLine():
            Line((280.5487942696, -140), (270.5487942696, -150))
            ThreePointArc((270.5487942696, -150), (277.6198620814, -147.0710678119), (280.5487942696, -140))
        make_face()
    extrude(amount=F9_DEPTH)


with BuildPart() as f11:
    # F0 (on Top) → F11 (new body)
    with BuildSketch(Plane.XY):
        with BuildLine():
            Line((150.5487942696, -20), (120.5487942696, -20))
            ThreePointArc((120.5487942696, -20), (117.6198620814, -27.0710678119), (110.5487942696, -30))
            Line((110.5487942696, -30), (110.5487942696, -60))
            Line((110.5487942696, -60), (150.5487942696, -60))
            Line((150.5487942696, -60), (150.5487942696, -20))
        make_face()
    extrude(amount=F11_DEPTH)


with BuildPart() as f11b:
    # F0 (on Top) → F11, piece 2 (new body)
    with BuildSketch(Plane.XY):
        with BuildLine():
            Line((150.5487942696, -140), (150.5487942696, -100))
            Line((150.5487942696, -100), (120.5487942696, -100))
            ThreePointArc((120.5487942696, -100), (117.6198620814, -107.0710678119), (110.5487942696, -110))
            Line((110.5487942696, -110), (110.5487942696, -140))
            Line((110.5487942696, -140), (150.5487942696, -140))
        make_face()
    extrude(amount=F11_DEPTH)


with BuildPart() as f11c:
    # F0 (on Top) → F11, piece 3 (new body)
    with BuildSketch(Plane.XY):
        with Locations((170.5487942696, -80)):
            Rectangle(F0_W, F0_H)
    extrude(amount=F11_DEPTH)


with BuildPart() as f11d:
    # F0 (on Top) → F11, piece 4 (new body)
    with BuildSketch(Plane.XY):
        with BuildLine():
            ThreePointArc((160.5487942696, 20), (157.6198620814, 12.9289321881), (150.5487942696, 10))
            Line((150.5487942696, 10), (150.5487942696, -20))
            Line((150.5487942696, -20), (190.5487942696, -20))
            Line((190.5487942696, -20), (190.5487942696, 20))
            Line((190.5487942696, 20), (160.5487942696, 20))
        make_face()
        with BuildLine():
            Line((160.5487942696, 20), (150.5487942696, 20))
            Line((150.5487942696, 20), (150.5487942696, 10))
            ThreePointArc((150.5487942696, 10), (157.6198620814, 12.9289321881), (160.5487942696, 20))
        make_face()
    extrude(amount=F11_DEPTH)


with BuildPart() as f11e:
    # F0 (on Top) → F11, piece 5 (new body)
    with BuildSketch(Plane.XY):
        with Locations((210.5487942696, -40)):
            Rectangle(F0_W, F0_H)
    extrude(amount=F11_DEPTH)


with BuildPart() as f11f:
    # F0 (on Top) → F11, piece 6 (new body)
    with BuildSketch(Plane.XY):
        with Locations((210.5487942696, -120)):
            Rectangle(F0_W, F0_H)
    extrude(amount=F11_DEPTH)


with BuildPart() as f11g:
    # F0 (on Top) → F11, piece 7 (new body)
    with BuildSketch(Plane.XY):
        with Locations((250.5487942696, -80)):
            Rectangle(F0_W, F0_H)
    extrude(amount=F11_DEPTH)


with BuildPart() as f11h:
    # F0 (on Top) → F11, piece 8 (new body)
    with BuildSketch(Plane.XY):
        with BuildLine():
            Line((230.5487942696, 10), (230.5487942696, -20))
            Line((230.5487942696, -20), (270.5487942696, -20))
            Line((270.5487942696, -20), (270.5487942696, 20))
            Line((270.5487942696, 20), (240.5487942696, 20))
            ThreePointArc((240.5487942696, 20), (237.6198620814, 12.9289321881), (230.5487942696, 10))
        make_face()
        with BuildLine():
            Line((240.5487942696, 20), (230.5487942696, 20))
            Line((230.5487942696, 20), (230.5487942696, 10))
            ThreePointArc((230.5487942696, 10), (237.6198620814, 12.9289321881), (240.5487942696, 20))
        make_face()
    extrude(amount=F11_DEPTH)


with BuildPart() as f12:
    # F0 (on Top) → F12 (new body)
    with BuildSketch(Plane.XY):
        with BuildLine():
            Line((150.5487942696, 30), (150.5487942696, 20))
            Line((150.5487942696, 20), (160.5487942696, 20))
            ThreePointArc((160.5487942696, 20), (157.6198620814, 27.0710678119), (150.5487942696, 30))
        make_face()
    extrude(amount=F12_DEPTH)


with BuildPart() as f12b:
    # F0 (on Top) → F12, piece 2 (new body)
    with BuildSketch(Plane.XY):
        with BuildLine():
            Line((230.5487942696, 30), (230.5487942696, 20))
            Line((230.5487942696, 20), (240.5487942696, 20))
            ThreePointArc((240.5487942696, 20), (237.6198620814, 27.0710678119), (230.5487942696, 30))
        make_face()
    extrude(amount=F12_DEPTH)


solid = Compound([f1.part, f5.part, f5b.part, f5c.part, f5d.part, f5e.part, f5f.part, f5g.part, f5h.part, f6.part, f9.part, f9b.part, f11.part, f11b.part, f11c.part, f11d.part, f11e.part, f11f.part, f11g.part, f11h.part, f12.part, f12b.part])
